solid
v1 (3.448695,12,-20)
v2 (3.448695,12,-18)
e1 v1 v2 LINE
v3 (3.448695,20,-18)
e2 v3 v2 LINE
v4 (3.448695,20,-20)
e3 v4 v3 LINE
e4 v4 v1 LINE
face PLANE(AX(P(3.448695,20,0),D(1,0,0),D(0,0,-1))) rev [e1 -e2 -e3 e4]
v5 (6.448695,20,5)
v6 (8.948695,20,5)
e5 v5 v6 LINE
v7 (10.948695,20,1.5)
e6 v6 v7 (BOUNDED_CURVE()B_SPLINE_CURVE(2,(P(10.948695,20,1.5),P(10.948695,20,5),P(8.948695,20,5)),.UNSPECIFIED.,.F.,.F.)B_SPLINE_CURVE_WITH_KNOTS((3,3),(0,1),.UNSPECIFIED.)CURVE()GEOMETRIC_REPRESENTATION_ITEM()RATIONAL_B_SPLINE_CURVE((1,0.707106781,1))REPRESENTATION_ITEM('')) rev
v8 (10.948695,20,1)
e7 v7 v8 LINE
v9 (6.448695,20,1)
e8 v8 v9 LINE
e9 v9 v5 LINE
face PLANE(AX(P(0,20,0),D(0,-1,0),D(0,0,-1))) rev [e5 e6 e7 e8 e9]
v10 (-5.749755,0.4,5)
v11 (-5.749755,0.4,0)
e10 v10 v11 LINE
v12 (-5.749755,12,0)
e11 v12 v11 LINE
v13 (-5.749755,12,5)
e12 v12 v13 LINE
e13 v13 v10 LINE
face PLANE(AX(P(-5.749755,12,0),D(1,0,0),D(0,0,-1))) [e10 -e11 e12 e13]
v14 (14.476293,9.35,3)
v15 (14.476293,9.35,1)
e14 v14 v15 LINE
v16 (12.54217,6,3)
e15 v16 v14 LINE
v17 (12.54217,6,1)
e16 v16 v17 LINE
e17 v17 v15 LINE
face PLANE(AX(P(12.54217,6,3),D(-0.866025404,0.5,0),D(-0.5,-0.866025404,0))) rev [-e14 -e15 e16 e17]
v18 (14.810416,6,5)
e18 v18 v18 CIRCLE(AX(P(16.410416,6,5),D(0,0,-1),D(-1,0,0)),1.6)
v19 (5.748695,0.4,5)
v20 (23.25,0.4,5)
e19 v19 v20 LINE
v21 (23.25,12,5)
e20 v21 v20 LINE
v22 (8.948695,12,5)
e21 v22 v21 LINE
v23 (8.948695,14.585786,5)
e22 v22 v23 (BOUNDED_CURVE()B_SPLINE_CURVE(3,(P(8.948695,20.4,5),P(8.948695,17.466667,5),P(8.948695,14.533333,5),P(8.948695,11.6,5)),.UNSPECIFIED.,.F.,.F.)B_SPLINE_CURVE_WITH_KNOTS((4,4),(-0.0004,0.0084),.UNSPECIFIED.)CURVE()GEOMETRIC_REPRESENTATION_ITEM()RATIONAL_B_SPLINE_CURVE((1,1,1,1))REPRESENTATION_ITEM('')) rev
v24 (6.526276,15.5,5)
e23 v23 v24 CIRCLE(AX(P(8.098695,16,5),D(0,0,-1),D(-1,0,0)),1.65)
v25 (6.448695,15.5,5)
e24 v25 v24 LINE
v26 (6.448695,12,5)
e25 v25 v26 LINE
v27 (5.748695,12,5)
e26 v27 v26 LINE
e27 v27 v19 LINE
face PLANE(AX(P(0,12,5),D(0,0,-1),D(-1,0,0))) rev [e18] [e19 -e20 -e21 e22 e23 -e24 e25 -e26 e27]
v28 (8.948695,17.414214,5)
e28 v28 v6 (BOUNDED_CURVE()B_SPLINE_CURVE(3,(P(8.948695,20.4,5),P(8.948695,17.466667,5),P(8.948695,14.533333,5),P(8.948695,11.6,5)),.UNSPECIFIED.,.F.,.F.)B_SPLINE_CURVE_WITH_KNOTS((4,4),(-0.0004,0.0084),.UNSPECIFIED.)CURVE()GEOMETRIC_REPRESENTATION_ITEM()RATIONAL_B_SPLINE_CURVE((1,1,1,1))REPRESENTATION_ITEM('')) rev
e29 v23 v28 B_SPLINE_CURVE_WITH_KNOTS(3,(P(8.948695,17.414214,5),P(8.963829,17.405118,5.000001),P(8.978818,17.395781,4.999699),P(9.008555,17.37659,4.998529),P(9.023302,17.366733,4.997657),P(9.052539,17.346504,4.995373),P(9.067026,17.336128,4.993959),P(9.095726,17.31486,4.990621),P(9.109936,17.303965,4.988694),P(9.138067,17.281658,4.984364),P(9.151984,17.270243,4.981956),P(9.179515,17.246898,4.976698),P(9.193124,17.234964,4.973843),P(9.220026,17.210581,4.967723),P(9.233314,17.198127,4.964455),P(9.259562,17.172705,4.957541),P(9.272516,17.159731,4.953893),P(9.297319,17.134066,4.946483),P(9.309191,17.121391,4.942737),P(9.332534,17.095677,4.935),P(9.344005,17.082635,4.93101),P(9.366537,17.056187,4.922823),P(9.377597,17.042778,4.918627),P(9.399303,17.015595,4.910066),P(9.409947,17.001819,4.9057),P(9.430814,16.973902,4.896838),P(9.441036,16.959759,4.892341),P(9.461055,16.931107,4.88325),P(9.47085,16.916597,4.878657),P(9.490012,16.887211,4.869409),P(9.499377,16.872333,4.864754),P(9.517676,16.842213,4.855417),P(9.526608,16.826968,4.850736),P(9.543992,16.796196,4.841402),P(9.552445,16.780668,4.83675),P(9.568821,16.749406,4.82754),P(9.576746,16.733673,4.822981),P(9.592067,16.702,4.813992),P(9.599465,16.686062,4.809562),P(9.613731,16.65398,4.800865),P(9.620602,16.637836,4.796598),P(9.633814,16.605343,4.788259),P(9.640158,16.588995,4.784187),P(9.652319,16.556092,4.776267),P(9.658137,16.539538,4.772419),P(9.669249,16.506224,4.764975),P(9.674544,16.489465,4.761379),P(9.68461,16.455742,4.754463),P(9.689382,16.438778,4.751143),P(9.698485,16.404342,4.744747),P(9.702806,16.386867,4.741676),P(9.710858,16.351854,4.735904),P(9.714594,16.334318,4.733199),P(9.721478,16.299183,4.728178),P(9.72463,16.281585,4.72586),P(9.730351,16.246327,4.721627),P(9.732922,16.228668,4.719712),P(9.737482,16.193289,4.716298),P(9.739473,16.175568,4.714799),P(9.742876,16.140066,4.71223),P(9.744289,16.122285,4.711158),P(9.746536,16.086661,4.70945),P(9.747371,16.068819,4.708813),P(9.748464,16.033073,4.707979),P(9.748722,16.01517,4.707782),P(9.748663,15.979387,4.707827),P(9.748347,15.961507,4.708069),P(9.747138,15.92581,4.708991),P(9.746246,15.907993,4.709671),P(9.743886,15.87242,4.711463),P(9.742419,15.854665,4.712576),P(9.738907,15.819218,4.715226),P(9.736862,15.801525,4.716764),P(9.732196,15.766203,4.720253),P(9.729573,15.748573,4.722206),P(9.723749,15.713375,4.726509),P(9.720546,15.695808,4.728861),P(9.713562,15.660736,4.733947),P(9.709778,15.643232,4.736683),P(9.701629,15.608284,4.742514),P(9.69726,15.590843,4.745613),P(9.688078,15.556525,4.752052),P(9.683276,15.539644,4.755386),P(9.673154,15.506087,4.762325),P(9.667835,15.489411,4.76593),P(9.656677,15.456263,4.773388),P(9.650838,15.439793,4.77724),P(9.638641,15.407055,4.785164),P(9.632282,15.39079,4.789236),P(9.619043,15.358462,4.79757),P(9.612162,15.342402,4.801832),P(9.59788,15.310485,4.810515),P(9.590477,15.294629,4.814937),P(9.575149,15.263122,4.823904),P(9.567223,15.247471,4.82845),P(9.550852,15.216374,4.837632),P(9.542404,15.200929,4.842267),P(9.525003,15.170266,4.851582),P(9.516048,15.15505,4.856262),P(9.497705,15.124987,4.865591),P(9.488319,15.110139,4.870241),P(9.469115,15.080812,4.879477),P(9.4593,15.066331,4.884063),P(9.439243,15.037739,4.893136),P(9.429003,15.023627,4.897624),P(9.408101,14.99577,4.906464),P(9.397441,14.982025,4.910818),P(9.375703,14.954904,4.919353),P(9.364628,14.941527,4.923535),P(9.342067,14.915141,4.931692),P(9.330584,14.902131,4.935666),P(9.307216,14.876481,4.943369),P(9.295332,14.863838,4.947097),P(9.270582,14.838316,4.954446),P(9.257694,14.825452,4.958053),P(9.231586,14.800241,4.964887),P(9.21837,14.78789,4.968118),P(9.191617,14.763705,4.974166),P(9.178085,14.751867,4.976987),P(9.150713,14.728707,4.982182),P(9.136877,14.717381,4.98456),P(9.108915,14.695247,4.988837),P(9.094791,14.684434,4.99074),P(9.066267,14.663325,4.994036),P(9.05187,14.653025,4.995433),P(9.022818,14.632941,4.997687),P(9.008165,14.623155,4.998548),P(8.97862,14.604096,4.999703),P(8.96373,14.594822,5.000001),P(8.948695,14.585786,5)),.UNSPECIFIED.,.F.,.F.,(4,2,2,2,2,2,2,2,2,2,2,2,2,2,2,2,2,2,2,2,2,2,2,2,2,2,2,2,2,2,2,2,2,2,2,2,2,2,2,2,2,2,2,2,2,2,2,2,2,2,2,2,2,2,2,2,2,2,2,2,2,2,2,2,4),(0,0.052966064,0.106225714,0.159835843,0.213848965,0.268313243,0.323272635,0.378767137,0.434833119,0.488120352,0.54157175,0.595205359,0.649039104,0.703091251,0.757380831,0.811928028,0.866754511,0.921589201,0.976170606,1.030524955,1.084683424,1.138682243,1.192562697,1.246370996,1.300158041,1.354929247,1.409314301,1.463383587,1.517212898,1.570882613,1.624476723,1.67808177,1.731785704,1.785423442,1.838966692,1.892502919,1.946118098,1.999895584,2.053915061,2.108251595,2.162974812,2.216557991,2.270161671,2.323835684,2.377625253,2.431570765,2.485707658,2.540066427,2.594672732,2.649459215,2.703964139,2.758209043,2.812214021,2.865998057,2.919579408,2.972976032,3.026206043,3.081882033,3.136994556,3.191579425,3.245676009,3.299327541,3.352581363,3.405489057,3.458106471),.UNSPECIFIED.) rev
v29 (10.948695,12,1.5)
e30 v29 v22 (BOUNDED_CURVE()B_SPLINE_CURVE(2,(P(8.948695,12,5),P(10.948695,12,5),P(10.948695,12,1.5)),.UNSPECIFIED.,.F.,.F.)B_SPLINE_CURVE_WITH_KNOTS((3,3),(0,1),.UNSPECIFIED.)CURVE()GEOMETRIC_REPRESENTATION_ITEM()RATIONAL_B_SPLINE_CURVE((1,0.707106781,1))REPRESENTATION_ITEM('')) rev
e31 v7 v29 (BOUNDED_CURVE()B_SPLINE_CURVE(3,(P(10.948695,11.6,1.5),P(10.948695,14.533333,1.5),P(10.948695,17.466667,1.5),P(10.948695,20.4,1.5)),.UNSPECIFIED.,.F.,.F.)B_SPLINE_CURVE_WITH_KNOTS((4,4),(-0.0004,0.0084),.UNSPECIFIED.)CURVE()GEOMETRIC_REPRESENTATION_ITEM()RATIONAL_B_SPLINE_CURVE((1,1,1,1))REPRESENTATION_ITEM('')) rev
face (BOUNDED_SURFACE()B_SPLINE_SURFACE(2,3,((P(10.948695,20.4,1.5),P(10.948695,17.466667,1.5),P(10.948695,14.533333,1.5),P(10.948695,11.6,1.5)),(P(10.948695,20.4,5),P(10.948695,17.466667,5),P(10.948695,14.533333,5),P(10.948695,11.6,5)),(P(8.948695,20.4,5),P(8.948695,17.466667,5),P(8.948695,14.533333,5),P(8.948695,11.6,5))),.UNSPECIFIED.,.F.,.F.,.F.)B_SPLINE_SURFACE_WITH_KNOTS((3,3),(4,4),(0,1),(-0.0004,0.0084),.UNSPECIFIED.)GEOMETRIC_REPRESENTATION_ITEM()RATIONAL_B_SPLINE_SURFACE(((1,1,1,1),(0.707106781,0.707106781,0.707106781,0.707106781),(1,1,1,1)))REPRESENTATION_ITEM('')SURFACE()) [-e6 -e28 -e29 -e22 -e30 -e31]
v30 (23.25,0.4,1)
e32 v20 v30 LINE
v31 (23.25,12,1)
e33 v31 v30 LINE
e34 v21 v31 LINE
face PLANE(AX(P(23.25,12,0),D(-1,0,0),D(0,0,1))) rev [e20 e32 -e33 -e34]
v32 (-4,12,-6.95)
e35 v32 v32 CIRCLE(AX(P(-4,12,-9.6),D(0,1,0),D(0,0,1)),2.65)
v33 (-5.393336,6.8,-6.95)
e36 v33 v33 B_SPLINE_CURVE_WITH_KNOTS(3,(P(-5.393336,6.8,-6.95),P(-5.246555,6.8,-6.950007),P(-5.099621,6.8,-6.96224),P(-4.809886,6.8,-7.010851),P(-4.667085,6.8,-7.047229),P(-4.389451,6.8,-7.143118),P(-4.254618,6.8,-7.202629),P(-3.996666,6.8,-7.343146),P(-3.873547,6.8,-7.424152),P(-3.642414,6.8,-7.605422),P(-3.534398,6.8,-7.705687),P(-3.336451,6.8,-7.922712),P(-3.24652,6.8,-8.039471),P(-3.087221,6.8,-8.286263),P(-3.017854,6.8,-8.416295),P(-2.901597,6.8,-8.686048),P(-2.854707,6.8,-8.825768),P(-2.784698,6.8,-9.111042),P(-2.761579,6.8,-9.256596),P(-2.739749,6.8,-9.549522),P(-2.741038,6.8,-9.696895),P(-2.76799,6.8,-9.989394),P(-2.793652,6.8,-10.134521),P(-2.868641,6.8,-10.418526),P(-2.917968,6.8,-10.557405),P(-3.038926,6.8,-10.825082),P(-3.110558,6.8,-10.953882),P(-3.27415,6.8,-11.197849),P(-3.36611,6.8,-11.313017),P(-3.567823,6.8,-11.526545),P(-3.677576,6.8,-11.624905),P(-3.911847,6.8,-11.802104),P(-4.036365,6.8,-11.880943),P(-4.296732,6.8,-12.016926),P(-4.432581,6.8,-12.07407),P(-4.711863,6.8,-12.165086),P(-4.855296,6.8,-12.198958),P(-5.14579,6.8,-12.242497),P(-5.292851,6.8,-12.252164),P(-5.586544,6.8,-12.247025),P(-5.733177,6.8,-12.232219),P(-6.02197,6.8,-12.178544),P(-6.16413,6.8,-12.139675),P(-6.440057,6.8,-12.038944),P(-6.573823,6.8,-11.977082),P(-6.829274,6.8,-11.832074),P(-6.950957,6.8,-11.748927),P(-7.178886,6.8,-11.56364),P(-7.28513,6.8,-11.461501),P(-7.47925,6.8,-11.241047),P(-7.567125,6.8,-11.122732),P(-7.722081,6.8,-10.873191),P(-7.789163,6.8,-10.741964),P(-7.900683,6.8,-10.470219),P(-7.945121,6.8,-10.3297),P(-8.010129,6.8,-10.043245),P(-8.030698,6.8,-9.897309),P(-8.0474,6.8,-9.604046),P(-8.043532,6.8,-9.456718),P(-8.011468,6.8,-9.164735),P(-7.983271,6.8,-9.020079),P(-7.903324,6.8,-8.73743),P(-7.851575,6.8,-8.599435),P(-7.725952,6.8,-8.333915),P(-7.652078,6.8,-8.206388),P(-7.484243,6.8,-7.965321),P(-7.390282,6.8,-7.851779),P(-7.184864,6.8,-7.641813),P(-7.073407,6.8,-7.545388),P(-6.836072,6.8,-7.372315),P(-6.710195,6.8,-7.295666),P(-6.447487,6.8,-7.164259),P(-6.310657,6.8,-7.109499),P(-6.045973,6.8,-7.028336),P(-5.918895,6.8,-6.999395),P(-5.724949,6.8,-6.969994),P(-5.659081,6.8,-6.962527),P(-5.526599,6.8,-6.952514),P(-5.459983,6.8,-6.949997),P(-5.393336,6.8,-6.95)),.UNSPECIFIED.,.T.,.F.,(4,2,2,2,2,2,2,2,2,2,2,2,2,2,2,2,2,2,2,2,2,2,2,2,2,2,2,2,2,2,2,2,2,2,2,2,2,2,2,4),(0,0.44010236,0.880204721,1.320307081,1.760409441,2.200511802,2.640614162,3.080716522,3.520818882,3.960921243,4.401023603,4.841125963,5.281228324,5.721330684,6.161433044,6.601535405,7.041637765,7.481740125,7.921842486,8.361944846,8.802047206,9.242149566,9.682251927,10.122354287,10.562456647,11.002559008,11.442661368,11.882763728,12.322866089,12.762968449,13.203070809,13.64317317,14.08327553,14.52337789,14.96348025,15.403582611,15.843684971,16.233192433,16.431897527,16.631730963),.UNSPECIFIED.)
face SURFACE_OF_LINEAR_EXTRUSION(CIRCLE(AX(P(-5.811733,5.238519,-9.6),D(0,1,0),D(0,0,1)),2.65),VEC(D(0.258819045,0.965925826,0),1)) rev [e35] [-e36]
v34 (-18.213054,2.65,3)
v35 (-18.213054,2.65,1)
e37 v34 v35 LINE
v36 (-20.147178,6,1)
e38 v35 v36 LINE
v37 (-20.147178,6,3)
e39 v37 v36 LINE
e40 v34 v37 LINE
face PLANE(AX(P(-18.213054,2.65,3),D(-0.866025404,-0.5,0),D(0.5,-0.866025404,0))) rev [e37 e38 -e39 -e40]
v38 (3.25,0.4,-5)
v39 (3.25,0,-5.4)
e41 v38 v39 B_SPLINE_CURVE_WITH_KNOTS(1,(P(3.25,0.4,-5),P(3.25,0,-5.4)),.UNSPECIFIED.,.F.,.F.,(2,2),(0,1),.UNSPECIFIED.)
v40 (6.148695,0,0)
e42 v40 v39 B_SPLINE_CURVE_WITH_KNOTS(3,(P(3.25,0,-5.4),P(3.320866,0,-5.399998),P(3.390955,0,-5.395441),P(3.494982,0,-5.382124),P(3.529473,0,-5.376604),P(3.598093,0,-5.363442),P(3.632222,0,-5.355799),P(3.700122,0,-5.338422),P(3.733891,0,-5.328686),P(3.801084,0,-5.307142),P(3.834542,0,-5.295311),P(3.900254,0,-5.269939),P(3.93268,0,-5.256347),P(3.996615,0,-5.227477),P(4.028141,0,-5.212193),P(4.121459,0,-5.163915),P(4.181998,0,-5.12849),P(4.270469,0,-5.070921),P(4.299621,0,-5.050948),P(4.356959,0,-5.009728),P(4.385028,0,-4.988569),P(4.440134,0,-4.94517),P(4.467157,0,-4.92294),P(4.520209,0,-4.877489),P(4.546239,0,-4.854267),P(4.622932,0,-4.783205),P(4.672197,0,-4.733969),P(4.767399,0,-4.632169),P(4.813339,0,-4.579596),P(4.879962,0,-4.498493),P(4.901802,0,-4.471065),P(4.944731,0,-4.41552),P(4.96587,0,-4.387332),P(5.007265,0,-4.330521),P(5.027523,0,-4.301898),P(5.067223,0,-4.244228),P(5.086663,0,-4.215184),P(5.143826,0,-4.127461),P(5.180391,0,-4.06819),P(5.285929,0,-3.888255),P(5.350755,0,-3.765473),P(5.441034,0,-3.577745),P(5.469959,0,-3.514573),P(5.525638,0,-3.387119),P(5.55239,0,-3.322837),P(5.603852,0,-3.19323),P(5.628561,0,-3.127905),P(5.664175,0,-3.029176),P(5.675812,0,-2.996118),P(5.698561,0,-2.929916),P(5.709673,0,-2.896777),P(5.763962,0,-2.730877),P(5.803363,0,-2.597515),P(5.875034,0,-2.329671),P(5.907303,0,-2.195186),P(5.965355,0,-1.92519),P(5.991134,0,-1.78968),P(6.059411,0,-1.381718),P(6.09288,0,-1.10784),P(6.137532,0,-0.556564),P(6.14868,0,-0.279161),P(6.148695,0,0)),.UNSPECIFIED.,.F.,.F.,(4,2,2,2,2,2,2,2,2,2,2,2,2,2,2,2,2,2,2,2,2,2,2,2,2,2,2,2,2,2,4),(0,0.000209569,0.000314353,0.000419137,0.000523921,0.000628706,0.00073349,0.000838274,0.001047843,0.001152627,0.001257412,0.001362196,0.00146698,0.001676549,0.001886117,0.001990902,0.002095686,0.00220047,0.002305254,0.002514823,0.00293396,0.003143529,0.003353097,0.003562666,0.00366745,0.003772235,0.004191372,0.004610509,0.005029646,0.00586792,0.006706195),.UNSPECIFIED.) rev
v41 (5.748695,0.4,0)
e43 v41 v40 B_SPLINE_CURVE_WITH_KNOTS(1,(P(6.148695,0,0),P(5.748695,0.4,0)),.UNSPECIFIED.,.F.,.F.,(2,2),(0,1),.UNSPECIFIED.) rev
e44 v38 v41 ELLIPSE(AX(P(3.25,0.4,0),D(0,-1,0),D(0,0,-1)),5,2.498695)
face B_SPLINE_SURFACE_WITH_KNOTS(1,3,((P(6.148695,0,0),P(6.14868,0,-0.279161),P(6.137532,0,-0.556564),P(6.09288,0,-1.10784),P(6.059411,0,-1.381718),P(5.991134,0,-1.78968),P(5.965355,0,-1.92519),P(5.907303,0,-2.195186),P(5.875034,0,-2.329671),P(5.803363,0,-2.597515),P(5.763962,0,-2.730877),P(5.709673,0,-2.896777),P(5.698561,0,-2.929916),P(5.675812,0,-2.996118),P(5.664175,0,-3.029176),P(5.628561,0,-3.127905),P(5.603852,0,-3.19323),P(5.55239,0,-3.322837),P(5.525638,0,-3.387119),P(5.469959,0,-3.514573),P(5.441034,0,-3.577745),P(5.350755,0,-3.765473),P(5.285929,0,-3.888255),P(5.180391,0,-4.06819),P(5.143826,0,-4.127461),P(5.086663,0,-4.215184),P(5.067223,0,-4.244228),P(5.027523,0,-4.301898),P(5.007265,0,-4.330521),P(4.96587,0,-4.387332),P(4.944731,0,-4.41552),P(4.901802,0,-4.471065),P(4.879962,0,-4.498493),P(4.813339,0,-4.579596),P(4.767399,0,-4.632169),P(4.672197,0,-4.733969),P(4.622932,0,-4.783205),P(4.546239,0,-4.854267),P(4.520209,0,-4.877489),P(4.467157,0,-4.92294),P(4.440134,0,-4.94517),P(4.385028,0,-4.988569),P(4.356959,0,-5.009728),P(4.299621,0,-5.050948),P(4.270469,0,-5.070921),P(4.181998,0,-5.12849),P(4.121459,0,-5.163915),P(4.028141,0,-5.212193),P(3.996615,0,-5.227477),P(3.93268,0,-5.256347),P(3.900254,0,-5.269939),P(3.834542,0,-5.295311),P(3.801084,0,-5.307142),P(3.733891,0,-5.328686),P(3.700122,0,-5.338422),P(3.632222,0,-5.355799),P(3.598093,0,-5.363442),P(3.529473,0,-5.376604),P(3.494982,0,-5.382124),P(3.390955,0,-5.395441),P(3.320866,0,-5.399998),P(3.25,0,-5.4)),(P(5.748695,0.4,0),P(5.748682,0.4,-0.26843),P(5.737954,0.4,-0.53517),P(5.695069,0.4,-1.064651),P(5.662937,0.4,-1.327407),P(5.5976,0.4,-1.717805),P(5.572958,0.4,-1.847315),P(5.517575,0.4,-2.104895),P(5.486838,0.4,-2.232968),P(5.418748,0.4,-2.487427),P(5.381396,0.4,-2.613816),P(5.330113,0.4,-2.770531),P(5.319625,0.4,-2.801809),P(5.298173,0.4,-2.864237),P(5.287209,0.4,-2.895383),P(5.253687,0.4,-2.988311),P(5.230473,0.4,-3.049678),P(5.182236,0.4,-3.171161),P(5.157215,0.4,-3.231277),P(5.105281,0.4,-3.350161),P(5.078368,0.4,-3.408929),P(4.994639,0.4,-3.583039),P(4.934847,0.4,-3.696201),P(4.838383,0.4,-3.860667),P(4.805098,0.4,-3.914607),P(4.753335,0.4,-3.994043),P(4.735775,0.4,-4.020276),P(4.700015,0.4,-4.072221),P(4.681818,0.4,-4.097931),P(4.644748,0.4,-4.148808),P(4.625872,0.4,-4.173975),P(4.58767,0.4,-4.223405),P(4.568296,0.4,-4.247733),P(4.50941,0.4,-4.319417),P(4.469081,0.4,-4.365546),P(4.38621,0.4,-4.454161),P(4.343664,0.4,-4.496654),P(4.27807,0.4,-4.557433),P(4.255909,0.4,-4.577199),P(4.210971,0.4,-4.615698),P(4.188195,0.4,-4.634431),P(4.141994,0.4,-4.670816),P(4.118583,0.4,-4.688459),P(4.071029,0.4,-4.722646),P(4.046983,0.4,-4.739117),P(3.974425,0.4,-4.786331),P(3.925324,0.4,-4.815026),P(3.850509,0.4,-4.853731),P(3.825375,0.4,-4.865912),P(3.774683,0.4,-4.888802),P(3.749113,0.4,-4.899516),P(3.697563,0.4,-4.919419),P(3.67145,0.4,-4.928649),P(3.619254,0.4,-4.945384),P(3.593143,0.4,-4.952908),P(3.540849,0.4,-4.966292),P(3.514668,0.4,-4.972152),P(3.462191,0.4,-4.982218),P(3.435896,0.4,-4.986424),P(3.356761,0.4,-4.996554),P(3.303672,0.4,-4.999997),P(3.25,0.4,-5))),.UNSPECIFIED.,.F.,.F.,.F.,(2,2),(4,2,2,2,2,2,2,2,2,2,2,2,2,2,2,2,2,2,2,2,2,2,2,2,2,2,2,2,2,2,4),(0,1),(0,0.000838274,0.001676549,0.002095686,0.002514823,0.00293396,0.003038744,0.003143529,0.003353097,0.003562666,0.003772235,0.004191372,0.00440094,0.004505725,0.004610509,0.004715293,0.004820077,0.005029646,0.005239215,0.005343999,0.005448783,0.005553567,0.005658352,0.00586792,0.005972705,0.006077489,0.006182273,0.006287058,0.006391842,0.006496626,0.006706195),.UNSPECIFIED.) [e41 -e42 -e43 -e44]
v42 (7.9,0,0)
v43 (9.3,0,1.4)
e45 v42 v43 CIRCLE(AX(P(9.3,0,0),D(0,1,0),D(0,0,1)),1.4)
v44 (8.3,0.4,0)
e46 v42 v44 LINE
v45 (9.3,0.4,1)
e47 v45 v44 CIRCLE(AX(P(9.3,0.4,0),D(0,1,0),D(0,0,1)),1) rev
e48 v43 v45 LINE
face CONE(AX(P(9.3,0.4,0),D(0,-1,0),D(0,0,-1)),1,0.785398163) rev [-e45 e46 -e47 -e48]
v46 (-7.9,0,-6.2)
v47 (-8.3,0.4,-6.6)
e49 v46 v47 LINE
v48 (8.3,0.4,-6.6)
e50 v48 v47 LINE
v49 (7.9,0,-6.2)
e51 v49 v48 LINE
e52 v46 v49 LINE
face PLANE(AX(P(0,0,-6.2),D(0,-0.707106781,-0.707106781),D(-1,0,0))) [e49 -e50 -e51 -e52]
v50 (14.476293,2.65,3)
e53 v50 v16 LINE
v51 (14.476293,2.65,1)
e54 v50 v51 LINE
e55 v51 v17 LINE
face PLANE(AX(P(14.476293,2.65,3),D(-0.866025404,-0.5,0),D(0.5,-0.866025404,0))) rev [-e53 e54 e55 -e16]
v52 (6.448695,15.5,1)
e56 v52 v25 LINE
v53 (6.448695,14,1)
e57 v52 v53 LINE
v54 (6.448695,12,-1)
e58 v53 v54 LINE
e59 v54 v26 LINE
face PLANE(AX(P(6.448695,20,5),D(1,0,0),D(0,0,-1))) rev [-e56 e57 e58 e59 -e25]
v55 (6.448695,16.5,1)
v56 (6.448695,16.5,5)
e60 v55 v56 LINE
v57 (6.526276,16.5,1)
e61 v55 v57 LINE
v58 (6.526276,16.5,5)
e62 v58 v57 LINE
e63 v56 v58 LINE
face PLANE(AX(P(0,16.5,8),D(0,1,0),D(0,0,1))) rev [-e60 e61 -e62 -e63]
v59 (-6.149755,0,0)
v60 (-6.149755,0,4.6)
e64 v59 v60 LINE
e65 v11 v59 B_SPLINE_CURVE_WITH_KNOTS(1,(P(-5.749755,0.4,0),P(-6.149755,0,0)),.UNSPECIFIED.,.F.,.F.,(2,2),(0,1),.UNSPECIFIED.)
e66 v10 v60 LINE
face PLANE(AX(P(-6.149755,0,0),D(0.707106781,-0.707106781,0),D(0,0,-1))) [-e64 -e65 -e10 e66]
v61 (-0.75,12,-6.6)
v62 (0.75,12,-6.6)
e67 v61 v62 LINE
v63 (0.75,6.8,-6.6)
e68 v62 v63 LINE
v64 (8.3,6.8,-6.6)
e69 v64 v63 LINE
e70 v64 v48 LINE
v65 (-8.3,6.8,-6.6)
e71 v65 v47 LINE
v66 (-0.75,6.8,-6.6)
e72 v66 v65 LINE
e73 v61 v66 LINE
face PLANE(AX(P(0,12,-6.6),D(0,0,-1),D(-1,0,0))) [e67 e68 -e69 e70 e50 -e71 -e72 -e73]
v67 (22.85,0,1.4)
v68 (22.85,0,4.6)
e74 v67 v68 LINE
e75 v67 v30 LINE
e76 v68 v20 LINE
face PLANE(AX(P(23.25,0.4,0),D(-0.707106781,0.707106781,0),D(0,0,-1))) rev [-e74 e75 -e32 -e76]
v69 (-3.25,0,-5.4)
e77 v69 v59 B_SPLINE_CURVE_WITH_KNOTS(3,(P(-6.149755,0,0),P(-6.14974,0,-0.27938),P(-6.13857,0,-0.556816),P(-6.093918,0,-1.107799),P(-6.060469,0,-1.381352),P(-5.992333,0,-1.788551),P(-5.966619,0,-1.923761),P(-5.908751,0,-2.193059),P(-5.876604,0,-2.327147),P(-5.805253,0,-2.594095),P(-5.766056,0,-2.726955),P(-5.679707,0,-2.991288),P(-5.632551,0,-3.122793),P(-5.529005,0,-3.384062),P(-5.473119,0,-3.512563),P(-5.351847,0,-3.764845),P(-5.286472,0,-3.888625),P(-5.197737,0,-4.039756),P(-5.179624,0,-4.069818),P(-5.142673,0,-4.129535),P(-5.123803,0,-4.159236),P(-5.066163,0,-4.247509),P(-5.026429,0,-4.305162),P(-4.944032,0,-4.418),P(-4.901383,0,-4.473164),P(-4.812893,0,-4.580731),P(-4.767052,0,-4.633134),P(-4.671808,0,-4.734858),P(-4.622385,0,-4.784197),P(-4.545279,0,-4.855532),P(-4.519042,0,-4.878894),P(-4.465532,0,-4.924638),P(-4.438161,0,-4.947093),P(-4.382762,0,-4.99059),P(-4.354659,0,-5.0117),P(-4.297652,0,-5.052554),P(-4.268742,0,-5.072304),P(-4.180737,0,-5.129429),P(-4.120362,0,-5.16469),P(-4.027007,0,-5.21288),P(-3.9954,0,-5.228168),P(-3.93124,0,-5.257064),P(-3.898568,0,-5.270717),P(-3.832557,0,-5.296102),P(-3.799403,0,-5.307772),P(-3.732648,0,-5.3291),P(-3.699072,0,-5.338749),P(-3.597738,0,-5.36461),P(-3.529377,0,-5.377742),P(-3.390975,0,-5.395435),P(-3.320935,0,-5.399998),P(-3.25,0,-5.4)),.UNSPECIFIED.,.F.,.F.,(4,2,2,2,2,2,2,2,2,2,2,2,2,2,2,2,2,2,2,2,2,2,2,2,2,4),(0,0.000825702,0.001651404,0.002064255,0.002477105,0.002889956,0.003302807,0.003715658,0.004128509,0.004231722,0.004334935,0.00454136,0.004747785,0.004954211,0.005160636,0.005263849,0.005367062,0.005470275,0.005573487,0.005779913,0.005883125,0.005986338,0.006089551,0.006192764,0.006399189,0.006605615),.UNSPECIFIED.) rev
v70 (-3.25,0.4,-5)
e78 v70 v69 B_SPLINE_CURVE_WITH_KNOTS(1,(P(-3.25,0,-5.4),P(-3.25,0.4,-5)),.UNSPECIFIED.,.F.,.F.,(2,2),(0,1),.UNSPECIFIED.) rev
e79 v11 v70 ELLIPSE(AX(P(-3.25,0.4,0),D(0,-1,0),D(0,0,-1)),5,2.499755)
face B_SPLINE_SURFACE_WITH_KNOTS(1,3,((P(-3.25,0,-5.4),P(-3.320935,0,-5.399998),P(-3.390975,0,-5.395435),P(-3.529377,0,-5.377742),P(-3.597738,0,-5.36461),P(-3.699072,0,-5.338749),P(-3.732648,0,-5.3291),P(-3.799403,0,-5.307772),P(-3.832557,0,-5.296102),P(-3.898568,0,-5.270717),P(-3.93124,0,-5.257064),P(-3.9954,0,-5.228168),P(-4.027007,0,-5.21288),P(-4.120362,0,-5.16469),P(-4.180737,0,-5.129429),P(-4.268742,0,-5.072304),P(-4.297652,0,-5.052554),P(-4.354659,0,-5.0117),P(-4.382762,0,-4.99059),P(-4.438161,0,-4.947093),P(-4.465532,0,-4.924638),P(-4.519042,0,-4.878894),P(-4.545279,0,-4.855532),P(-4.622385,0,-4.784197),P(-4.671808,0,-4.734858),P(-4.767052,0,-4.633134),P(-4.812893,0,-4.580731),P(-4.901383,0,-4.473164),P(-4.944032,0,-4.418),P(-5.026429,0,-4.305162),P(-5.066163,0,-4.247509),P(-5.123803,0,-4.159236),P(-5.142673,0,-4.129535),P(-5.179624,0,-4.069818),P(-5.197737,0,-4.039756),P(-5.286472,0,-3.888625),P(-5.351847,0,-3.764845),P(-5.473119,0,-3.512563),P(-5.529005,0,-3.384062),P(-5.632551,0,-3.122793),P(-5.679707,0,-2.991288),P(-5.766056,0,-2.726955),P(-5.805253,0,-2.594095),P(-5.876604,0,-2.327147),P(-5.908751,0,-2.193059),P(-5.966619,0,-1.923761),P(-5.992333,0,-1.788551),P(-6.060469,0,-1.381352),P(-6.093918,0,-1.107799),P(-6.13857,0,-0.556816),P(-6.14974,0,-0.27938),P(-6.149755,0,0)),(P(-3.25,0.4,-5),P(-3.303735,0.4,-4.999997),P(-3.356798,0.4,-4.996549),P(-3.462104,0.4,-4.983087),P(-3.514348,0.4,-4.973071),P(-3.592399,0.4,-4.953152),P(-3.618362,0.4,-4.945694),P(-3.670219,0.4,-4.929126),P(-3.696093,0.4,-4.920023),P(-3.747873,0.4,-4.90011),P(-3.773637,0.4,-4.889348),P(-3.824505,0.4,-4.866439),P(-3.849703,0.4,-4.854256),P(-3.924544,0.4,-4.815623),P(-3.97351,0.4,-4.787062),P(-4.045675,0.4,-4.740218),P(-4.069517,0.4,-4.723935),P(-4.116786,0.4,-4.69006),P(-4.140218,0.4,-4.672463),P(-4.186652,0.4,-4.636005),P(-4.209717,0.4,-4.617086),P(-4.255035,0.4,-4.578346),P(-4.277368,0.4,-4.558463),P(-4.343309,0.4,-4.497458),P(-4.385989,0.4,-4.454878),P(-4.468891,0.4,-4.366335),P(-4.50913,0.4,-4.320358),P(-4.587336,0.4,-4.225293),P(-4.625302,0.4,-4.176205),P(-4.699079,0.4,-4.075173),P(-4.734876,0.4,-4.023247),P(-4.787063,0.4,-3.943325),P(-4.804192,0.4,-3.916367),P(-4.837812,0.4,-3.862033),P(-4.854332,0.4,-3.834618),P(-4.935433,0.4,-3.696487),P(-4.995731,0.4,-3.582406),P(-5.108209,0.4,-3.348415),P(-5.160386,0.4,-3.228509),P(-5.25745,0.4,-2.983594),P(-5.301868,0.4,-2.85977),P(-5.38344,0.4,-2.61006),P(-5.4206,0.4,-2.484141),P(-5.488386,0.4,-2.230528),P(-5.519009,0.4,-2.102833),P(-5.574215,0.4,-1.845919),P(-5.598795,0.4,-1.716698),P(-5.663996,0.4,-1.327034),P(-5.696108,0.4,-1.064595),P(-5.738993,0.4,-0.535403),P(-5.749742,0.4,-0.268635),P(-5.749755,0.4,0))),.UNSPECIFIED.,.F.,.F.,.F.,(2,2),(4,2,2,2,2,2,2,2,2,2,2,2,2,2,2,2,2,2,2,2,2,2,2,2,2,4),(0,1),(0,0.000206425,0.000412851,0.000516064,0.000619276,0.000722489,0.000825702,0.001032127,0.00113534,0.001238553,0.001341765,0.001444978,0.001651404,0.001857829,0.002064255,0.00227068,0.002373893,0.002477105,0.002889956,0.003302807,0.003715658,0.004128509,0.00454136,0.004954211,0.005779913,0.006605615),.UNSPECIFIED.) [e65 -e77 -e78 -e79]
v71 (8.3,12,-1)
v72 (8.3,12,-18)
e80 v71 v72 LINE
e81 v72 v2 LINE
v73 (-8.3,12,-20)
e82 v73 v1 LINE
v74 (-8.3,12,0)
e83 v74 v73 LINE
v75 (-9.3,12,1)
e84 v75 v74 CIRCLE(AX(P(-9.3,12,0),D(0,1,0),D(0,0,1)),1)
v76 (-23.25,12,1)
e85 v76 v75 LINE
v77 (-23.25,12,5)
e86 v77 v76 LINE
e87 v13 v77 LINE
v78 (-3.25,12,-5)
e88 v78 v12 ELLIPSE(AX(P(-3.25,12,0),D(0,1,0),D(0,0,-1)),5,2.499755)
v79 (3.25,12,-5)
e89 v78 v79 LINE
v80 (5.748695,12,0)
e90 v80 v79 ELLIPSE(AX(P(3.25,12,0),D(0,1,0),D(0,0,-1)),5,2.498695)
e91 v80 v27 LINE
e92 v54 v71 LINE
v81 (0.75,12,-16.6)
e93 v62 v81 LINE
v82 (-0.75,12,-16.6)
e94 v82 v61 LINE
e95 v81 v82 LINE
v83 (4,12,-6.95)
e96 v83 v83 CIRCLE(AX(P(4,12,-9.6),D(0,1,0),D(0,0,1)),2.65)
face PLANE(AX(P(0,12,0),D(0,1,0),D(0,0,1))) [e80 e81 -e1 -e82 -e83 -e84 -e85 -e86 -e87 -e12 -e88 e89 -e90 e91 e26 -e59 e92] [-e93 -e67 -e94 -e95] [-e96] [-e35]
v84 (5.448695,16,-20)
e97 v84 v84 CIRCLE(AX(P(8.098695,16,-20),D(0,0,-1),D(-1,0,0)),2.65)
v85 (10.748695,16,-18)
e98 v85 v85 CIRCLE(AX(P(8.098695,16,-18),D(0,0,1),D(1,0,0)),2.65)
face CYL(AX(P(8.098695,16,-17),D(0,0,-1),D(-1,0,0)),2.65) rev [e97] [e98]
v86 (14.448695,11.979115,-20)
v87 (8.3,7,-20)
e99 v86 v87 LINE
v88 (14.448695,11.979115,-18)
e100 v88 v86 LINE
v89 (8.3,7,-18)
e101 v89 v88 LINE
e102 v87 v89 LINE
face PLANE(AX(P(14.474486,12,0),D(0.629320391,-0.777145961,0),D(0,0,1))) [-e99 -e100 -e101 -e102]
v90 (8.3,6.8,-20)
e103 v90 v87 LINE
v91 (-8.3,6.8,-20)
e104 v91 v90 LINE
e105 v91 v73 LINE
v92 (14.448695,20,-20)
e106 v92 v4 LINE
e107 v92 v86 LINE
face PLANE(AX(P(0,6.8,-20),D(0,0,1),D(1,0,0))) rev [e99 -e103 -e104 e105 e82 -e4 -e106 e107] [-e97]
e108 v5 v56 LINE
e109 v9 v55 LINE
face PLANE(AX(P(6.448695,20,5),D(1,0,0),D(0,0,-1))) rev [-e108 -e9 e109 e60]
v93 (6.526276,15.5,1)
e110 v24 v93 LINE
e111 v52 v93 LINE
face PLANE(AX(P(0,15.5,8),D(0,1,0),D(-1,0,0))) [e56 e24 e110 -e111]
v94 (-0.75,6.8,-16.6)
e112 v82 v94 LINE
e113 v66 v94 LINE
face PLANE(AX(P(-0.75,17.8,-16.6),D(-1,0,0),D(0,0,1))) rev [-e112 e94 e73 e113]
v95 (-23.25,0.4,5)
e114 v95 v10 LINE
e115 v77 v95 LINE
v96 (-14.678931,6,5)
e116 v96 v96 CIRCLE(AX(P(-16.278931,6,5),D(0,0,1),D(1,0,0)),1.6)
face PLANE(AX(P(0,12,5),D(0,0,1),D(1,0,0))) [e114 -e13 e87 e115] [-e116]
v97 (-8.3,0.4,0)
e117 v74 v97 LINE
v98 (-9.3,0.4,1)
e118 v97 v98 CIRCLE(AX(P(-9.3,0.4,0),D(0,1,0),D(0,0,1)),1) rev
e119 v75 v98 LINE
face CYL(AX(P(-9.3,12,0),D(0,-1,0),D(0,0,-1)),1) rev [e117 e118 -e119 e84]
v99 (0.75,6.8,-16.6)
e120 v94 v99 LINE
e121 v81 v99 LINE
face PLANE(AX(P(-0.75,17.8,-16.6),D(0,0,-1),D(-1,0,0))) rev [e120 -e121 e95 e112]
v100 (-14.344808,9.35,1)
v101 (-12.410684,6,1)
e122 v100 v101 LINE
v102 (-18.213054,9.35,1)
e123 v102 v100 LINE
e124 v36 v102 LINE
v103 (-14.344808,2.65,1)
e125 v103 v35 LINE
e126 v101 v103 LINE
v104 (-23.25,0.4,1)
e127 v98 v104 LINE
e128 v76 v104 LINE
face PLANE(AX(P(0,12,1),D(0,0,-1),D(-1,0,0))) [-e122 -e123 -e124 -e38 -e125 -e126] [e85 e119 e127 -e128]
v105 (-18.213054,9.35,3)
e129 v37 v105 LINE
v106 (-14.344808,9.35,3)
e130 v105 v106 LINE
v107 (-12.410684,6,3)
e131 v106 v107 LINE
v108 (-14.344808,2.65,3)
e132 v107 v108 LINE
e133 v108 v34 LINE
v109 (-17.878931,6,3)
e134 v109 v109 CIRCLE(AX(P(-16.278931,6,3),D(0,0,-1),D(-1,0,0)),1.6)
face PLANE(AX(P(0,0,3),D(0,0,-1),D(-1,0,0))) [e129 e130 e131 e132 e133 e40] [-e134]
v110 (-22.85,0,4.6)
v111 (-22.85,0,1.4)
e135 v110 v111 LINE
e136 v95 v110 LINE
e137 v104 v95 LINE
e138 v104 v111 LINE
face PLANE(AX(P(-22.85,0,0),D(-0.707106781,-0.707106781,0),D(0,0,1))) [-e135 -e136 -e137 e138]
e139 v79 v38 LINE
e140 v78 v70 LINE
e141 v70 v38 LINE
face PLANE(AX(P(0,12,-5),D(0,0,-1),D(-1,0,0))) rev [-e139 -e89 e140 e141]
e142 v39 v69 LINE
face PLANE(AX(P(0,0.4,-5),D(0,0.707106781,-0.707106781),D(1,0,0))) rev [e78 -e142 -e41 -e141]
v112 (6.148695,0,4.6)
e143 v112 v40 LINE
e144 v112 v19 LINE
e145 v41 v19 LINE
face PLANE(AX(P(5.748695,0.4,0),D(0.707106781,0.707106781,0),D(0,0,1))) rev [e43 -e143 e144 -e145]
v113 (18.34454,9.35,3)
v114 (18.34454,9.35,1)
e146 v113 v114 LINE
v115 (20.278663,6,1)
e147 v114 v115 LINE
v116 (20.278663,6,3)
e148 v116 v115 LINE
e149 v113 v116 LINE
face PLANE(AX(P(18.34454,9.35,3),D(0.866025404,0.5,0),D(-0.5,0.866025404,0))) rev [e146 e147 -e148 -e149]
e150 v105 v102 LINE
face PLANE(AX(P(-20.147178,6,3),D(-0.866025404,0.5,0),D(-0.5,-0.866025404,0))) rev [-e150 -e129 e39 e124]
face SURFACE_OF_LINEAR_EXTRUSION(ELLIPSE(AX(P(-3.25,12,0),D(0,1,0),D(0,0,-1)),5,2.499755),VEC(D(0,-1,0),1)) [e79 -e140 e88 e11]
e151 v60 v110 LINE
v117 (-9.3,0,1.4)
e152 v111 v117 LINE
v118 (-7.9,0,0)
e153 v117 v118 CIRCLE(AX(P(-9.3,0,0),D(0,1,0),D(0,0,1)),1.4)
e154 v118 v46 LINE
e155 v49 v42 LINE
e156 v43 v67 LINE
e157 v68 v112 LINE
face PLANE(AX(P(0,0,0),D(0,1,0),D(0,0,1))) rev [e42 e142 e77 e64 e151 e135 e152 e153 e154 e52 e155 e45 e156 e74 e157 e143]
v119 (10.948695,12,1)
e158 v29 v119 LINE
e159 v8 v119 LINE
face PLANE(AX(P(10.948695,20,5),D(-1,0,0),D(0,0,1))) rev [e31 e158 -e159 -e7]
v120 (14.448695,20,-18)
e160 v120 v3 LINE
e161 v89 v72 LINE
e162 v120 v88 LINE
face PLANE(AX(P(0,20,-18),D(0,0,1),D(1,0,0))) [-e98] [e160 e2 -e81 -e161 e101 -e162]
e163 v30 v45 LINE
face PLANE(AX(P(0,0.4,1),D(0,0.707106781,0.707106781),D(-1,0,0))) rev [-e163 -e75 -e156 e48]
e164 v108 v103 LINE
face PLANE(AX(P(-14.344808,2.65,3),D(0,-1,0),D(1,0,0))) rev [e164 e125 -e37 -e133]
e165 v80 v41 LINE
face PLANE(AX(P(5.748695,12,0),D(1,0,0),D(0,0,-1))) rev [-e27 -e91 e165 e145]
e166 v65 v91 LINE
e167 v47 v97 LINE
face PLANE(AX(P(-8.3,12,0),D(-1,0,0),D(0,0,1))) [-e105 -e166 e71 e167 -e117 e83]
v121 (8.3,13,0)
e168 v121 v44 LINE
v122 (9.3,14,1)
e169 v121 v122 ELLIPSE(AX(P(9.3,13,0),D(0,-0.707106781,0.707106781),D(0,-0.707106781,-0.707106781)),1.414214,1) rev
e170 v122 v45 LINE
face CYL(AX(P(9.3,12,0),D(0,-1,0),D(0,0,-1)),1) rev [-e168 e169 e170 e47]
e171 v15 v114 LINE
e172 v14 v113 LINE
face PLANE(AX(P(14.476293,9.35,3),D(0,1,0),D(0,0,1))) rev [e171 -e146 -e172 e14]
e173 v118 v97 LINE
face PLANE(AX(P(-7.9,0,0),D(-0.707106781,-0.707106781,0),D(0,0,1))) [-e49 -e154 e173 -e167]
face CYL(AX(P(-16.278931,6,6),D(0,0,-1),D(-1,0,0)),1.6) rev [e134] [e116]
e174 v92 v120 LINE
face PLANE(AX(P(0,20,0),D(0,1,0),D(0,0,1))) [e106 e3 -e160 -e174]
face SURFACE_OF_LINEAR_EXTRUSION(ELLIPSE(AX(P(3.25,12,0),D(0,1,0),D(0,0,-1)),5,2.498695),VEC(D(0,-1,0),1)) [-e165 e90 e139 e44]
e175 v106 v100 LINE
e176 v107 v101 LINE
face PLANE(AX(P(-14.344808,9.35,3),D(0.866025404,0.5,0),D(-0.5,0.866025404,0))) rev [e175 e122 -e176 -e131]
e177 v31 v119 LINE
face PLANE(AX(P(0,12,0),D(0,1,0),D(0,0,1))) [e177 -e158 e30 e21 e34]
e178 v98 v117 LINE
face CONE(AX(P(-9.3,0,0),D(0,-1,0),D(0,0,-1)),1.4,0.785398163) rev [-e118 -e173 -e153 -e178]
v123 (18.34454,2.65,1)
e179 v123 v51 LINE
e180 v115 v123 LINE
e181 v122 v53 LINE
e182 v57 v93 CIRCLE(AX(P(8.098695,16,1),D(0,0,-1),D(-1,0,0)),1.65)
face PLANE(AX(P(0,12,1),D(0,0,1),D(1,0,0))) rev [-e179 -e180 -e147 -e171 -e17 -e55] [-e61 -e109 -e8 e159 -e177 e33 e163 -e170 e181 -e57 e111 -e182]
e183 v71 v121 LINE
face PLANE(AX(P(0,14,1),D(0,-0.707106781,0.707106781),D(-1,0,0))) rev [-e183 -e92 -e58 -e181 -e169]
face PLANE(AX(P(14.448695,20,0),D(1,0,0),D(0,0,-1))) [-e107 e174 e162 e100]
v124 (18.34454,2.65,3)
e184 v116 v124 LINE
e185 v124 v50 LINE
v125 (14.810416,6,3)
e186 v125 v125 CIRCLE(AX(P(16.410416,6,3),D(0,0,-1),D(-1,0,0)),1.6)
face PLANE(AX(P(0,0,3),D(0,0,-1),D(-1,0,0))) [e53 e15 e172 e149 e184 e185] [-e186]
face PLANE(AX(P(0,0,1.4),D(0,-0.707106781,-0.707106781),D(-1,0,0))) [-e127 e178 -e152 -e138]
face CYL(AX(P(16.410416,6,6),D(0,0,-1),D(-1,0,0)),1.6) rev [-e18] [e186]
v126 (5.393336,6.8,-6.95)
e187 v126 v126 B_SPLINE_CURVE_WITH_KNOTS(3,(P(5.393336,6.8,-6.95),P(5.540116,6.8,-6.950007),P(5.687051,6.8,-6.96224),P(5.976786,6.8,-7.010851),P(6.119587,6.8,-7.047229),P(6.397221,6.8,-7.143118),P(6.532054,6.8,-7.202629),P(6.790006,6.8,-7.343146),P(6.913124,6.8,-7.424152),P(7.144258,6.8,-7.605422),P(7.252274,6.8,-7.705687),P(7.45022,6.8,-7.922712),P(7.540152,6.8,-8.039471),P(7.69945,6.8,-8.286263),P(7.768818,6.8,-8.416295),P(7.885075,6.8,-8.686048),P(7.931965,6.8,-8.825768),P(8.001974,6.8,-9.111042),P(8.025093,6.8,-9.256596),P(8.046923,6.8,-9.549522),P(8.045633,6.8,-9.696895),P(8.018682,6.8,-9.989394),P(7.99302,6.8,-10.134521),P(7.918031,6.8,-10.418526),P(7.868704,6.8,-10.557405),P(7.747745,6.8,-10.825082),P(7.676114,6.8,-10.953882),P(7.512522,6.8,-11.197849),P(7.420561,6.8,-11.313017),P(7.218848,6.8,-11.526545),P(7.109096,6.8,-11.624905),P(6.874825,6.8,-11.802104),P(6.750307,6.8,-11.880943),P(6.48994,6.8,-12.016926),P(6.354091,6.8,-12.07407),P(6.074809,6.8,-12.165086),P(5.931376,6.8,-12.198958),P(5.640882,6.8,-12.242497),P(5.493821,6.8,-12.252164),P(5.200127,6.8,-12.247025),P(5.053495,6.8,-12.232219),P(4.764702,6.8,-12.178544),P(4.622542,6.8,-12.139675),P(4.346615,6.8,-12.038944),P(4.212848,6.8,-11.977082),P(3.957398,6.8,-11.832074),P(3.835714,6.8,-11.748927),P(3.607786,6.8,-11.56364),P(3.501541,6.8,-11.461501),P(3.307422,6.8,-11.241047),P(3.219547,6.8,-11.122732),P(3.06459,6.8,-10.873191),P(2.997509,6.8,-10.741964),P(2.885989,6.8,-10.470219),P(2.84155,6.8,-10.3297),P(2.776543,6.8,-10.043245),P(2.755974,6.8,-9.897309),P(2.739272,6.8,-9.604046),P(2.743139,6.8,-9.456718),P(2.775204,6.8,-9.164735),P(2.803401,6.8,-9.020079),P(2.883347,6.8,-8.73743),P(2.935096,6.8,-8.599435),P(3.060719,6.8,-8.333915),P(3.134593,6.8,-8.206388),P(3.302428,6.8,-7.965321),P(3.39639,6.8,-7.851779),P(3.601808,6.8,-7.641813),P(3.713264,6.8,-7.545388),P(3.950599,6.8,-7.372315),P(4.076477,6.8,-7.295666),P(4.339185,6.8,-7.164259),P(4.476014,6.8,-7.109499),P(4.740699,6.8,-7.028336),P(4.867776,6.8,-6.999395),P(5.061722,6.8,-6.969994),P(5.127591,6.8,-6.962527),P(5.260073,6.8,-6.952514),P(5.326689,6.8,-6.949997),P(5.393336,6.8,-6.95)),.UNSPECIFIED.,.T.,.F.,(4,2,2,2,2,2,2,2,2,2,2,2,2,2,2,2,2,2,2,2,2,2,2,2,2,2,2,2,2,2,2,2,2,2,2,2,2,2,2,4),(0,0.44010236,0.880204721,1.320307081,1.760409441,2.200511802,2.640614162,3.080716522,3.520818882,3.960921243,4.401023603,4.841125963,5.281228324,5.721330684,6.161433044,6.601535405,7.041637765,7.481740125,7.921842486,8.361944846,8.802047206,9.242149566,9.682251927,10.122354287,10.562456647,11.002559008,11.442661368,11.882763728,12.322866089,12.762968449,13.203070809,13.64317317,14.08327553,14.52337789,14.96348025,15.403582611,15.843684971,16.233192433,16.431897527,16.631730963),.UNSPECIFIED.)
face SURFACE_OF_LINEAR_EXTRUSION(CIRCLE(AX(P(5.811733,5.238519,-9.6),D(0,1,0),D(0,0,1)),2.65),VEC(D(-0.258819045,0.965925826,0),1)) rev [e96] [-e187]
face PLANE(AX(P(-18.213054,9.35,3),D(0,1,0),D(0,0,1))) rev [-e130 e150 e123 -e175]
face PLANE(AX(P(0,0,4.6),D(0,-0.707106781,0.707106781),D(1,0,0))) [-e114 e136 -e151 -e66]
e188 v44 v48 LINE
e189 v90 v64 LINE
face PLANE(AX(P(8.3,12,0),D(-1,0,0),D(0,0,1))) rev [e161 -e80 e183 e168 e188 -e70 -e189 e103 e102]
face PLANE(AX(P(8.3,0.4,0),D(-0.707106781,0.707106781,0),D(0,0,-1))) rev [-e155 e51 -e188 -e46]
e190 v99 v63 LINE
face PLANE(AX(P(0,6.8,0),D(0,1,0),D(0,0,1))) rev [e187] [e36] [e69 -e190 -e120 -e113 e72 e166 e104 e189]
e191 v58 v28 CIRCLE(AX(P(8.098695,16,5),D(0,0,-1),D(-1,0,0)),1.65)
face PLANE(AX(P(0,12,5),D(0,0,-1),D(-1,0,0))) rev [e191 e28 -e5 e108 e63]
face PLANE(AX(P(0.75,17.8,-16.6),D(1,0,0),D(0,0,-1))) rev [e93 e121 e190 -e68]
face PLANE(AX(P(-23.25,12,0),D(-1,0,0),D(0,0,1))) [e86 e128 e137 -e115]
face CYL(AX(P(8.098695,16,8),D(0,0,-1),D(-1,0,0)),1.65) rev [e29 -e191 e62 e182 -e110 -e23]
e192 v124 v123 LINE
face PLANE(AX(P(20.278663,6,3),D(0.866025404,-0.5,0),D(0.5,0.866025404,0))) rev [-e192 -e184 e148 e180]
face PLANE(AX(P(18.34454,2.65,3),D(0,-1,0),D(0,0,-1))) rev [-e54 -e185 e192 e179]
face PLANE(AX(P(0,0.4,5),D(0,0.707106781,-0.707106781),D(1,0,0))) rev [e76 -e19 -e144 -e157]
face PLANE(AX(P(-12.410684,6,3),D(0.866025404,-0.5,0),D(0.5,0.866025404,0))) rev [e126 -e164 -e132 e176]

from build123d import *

# Parameters (mm, degrees)
BOSS_EXTRUDE1_DEPTH = 12
CUT_EXTRUDE1_DEPTH  = 2
SKETCH3_W           = 16.6
SKETCH3_H           = 13.4
BOSS_EXTRUDE2_DEPTH = 5.2
SKETCH5_R           = 1.6
CUT_EXTRUDE2_DEPTH  = 5
SKETCH6_W           = 4.5
SKETCH6_H           = 4
BOSS_EXTRUDE4_DEPTH = 8
CUT_EXTRUDE4_DEPTH  = 7
SKETCH8_R           = 2.65
CUT_EXTRUDE5_DEPTH  = 7
SKETCH10_R          = 2.65
CUT_EXTRUDE6_DEPTH  = 7
CHAMFER2_SIZE       = 2
SKETCH12_W          = 3
SKETCH12_H          = 2
SKETCH12_W_2        = 6.148694825
SKETCH12_W_3        = 1.851305175
BOSS_EXTRUDE5_DEPTH = 8
SKETCH13_R          = 2.65
CUT_EXTRUDE7_DEPTH  = 3
CHAMFER4_SIZE       = 5
CHAMFER4_SIZE_2     = 6.174485783
SKETCH16_W          = 1.5
SKETCH16_H          = 10
CUT_EXTRUDE8_DEPTH  = 11
CHAMFER5_SIZE       = 0.4
FILLET1_SIZE        = 2
FILLET1_SIZE_2      = 3.5


with BuildPart() as part:
    # Sketch1 → Boss-Extrude1 (new body)
    with BuildSketch(Plane(origin=(0, 0, 0), x_dir=(1, 0, 0), z_dir=(0, 1, 0))):
        with BuildLine():
            Line((-23.25, -5), (-5.749755012, -5))
            Line((-5.749755012, -5), (-5.749755012, 0))
            add(Edge.make_bspline(
                [(-3.25, 5), (-5.749755012, 5), (-5.749755012, 0)],
                knots=[0, 0, 0, 1.570796327, 1.570796327, 1.570796327], degree=2, weights=[1, 0.707106781, 1]))
            Line((-3.25, 5), (3.25, 5))
            add(Edge.make_bspline(
                [(5.748694825, 0), (5.748694825, 5), (3.25, 5)],
                knots=[4.71238898, 4.71238898, 4.71238898, 6.283185307, 6.283185307, 6.283185307], degree=2, weights=[1, 0.707106781, 1]))
            Line((5.748694825, 0), (5.748694825, -5))
            Line((5.748694825, -5), (23.25, -5))
            Line((23.25, -5), (23.25, -3))
            Line((23.25, -3), (23.25, -1))
            Line((23.25, -1), (9.3, -1))
            ThreePointArc((9.3, -1), (8.592893219, -0.707106781), (8.3, 0))
            Line((8.3, 0), (8.3, 6.6))
            Line((8.3, 6.6), (-8.3, 6.6))
            Line((-8.3, 6.6), (-8.3, 0))
            ThreePointArc((-8.3, 0), (-8.592893219, -0.707106781), (-9.3, -1))
            Line((-9.3, -1), (-23.25, -1))
            Line((-23.25, -1), (-23.25, -5))
        make_face()
    extrude(amount=BOSS_EXTRUDE1_DEPTH)

    # Sketch2 → Cut-Extrude1 (cut)
    with BuildSketch(Plane(origin=(0, 0, 1), x_dir=(-1, 0, 0), z_dir=(0, 0, -1))):
        Polygon((20.147177825, 6), (18.213054423, 9.35), (14.344807619, 9.35), (12.410684218, 6), (14.344807619, 2.65), (18.213054423, 2.65), align=None)
        Polygon((-12.542169585, 6), (-14.476292987, 9.35), (-18.34453979, 9.35), (-20.278663192, 6), (-18.34453979, 2.65), (-14.476292987, 2.65), align=None)
    extrude(amount=-CUT_EXTRUDE1_DEPTH, mode=Mode.SUBTRACT)

    # Sketch3 → Boss-Extrude2 (add)
    with BuildSketch(Plane(origin=(0, 12, 0), x_dir=(1, 0, 0), z_dir=(0, 1, 0))):
        with Locations((0, 13.3)):
            Rectangle(SKETCH3_W, SKETCH3_H)
    extrude(amount=-BOSS_EXTRUDE2_DEPTH)

    # Sketch5 → Cut-Extrude2 (cut)
    with BuildSketch(Plane(origin=(0, 0, 1), x_dir=(-1, 0, 0), z_dir=(0, 0, -1))):
        with Locations((-16.410416388, 6)):
            Circle(SKETCH5_R)
        with Locations((16.278931021, 6)):
            Circle(SKETCH5_R)
    extrude(amount=-CUT_EXTRUDE2_DEPTH, mode=Mode.SUBTRACT)

    # Sketch6 → Boss-Extrude4 (add)
    with BuildSketch(Plane(origin=(0, 12, 0), x_dir=(1, 0, 0), z_dir=(0, 1, 0))):
        with Locations((8.698694825, -3)):
            Rectangle(SKETCH6_W, SKETCH6_H)
    extrude(amount=BOSS_EXTRUDE4_DEPTH)

    # Sketch7 → Cut-Extrude4 (cut)
    with BuildSketch(Plane(origin=(0, 0, 1), x_dir=(-1, 0, 0), z_dir=(0, 0, -1))):
        with BuildLine():
            ThreePointArc((-6.448694825, 16), (-6.468205549, 16.252991544), (-6.526276305, 16.5))
            Line((-6.526276305, 16.5), (-7.999397269, 16.5))
            Line((-7.999397269, 16.5), (-7.999397269, 15.5))
            Line((-7.999397269, 15.5), (-6.526276305, 15.5))
            ThreePointArc((-6.526276305, 15.5), (-6.468205549, 15.747008456), (-6.448694825, 16))
        make_face()
        with BuildLine():
            Line((-7.999397269, 16.5), (-6.526276305, 16.5))
            ThreePointArc((-6.526276305, 16.5), (-9.748694825, 16), (-6.526276305, 15.5))
            Line((-6.526276305, 15.5), (-7.999397269, 15.5))
            Line((-7.999397269, 15.5), (-7.999397269, 16.5))
        make_face()
        with BuildLine():
            Line((-6.448694825, 15.5), (-6.448694825, 16))
            ThreePointArc((-6.448694825, 16), (-6.468205549, 15.747008456), (-6.526276305, 15.5))
            Line((-6.526276305, 15.5), (-6.448694825, 15.5))
        make_face()
        with BuildLine():
            Line((-6.448694825, 16), (-6.448694825, 16.5))
            Line((-6.448694825, 16.5), (-6.526276305, 16.5))
            ThreePointArc((-6.526276305, 16.5), (-6.468205549, 16.252991544), (-6.448694825, 16))
        make_face()
    extrude(amount=-CUT_EXTRUDE4_DEPTH, mode=Mode.SUBTRACT)

    # Sketch8 → Cut-Extrude5 (cut, along a direction that is not the sketch's normal)
    with BuildSketch(Plane(origin=(0, 12, 0), x_dir=(1, 0, 0), z_dir=(0, 1, 0))):
        with Locations((-4, 9.6)):
            Circle(SKETCH8_R)
    extrude(amount=-CUT_EXTRUDE5_DEPTH, dir=(0.2588190451025147, 0.96592582628907, -1.457918124587514e-13), mode=Mode.SUBTRACT)

    # Sketch10 → Cut-Extrude6 (cut, along a direction that is not the sketch's normal)
    with BuildSketch(Plane(origin=(0, 12, 0), x_dir=(1, 0, 0), z_dir=(0, 1, 0))):
        with Locations((4, 9.6)):
            Circle(SKETCH10_R)
    extrude(amount=-CUT_EXTRUDE6_DEPTH, dir=(-0.25881904510251447, 0.96592582628907, 0), mode=Mode.SUBTRACT)

    # Chamfer2
    chamfer2_edges = [part.edges().sort_by_distance(p)[0] for p in [
        (7.874347412, 12, 1),
    ]]
    chamfer(chamfer2_edges, length=CHAMFER2_SIZE)

    # Sketch12 → Boss-Extrude5 (add)
    with BuildSketch(Plane(origin=(0, 12, 0), x_dir=(1, 0, 0), z_dir=(0, 1, 0))):
        with Locations((4.948694825, 19)):
            Rectangle(SKETCH12_W, SKETCH12_H)
        with Locations((11.374347413, 19)):
            Rectangle(SKETCH12_W_2, SKETCH12_H)
        with Locations((7.374347413, 19)):
            Rectangle(SKETCH12_W_3, SKETCH12_H)
    extrude(amount=BOSS_EXTRUDE5_DEPTH)

    # Sketch13 → Cut-Extrude7 (cut)
    with BuildSketch(Plane(origin=(0, 0, -20), x_dir=(-1, 0, 0), z_dir=(0, 0, -1))):
        with Locations((-8.098694825, 16)):
            Circle(SKETCH13_R)
    extrude(amount=-CUT_EXTRUDE7_DEPTH, mode=Mode.SUBTRACT)

    # Chamfer4
    # the kernel refuses this chamfer: 6.174485783, 5 mm, written as the material it adds along each edge
    with BuildSketch(Plane(origin=(8.3, 12, -18), x_dir=(-0.037204697112204525, -0.9993076655929289, 0), z_dir=(0, 0, -1))) as chamfer4_piece_1_section:
        Polygon((CHAMFER4_SIZE * 0.999307665593, -CHAMFER4_SIZE * 0.0372046971122), (-CHAMFER4_SIZE_2 * 0.0372046971102, -CHAMFER4_SIZE_2 * 0.99930766554), (0, 0), align=None)
    chamfer4_piece_1 = extrude(amount=2, mode=Mode.PRIVATE)
    chamfer4_piece_1 = split(chamfer4_piece_1, bisect_by=Plane(origin=(14.448694825, 10.333304375, -19), z_dir=(-1, 0, 0)), keep=Keep.TOP, mode=Mode.PRIVATE)
    add(chamfer4_piece_1)

    # Sketch16 → Cut-Extrude8 (cut)
    with BuildSketch(Plane.XZ.offset(-6.8)):
        with Locations((0, -11.6)):
            Rectangle(SKETCH16_W, SKETCH16_H)
    extrude(amount=-CUT_EXTRUDE8_DEPTH, mode=Mode.SUBTRACT)

    # Chamfer5
    chamfer5_edges = [part.edges().sort_by_distance(p)[0] for p in [
        (0, 0, -5),
        (-5.260112096, 0, -2.972310439),
        (-5.749755012, 0, 2.5),
        (-14.499877506, 0, 5),
        (-23.25, 0, 3),
        (-16.275, 0, 1),
        (-8.592893219, 0, 0.707106781),
        (-8.3, 0, -3.3),
        (0, 0, -6.6),
        (8.3, 0, -3.3),
        (8.592893219, 0, 0.707106781),
        (16.275, 0, 1),
        (23.25, 0, 3),
        (14.499347412, 0, 5),
        (5.748694825, 0, 2.5),
        (5.259369228, 0, -2.972013605),
    ]]
    chamfer(chamfer5_edges, length=CHAMFER5_SIZE)

    # Fillet1
    # an asymmetric fillet: 3.5, 2 mm, written as the material it takes off along each edge
    with BuildSketch(Plane(origin=(10.948694825, 12, 5), x_dir=(-1, 0, 0), z_dir=(0, 1, 0))) as fillet1_piece_1:
        with BuildLine():
            Bezier((FILLET1_SIZE, 0), (0, 0), (0, -FILLET1_SIZE_2), weights=[1, 0.707106781, 1])
            Line((0, -FILLET1_SIZE_2), (0, 0))
            Line((0, 0), (FILLET1_SIZE, 0))
        make_face()
    extrude(amount=16.75, mode=Mode.SUBTRACT)


solid = part.part
